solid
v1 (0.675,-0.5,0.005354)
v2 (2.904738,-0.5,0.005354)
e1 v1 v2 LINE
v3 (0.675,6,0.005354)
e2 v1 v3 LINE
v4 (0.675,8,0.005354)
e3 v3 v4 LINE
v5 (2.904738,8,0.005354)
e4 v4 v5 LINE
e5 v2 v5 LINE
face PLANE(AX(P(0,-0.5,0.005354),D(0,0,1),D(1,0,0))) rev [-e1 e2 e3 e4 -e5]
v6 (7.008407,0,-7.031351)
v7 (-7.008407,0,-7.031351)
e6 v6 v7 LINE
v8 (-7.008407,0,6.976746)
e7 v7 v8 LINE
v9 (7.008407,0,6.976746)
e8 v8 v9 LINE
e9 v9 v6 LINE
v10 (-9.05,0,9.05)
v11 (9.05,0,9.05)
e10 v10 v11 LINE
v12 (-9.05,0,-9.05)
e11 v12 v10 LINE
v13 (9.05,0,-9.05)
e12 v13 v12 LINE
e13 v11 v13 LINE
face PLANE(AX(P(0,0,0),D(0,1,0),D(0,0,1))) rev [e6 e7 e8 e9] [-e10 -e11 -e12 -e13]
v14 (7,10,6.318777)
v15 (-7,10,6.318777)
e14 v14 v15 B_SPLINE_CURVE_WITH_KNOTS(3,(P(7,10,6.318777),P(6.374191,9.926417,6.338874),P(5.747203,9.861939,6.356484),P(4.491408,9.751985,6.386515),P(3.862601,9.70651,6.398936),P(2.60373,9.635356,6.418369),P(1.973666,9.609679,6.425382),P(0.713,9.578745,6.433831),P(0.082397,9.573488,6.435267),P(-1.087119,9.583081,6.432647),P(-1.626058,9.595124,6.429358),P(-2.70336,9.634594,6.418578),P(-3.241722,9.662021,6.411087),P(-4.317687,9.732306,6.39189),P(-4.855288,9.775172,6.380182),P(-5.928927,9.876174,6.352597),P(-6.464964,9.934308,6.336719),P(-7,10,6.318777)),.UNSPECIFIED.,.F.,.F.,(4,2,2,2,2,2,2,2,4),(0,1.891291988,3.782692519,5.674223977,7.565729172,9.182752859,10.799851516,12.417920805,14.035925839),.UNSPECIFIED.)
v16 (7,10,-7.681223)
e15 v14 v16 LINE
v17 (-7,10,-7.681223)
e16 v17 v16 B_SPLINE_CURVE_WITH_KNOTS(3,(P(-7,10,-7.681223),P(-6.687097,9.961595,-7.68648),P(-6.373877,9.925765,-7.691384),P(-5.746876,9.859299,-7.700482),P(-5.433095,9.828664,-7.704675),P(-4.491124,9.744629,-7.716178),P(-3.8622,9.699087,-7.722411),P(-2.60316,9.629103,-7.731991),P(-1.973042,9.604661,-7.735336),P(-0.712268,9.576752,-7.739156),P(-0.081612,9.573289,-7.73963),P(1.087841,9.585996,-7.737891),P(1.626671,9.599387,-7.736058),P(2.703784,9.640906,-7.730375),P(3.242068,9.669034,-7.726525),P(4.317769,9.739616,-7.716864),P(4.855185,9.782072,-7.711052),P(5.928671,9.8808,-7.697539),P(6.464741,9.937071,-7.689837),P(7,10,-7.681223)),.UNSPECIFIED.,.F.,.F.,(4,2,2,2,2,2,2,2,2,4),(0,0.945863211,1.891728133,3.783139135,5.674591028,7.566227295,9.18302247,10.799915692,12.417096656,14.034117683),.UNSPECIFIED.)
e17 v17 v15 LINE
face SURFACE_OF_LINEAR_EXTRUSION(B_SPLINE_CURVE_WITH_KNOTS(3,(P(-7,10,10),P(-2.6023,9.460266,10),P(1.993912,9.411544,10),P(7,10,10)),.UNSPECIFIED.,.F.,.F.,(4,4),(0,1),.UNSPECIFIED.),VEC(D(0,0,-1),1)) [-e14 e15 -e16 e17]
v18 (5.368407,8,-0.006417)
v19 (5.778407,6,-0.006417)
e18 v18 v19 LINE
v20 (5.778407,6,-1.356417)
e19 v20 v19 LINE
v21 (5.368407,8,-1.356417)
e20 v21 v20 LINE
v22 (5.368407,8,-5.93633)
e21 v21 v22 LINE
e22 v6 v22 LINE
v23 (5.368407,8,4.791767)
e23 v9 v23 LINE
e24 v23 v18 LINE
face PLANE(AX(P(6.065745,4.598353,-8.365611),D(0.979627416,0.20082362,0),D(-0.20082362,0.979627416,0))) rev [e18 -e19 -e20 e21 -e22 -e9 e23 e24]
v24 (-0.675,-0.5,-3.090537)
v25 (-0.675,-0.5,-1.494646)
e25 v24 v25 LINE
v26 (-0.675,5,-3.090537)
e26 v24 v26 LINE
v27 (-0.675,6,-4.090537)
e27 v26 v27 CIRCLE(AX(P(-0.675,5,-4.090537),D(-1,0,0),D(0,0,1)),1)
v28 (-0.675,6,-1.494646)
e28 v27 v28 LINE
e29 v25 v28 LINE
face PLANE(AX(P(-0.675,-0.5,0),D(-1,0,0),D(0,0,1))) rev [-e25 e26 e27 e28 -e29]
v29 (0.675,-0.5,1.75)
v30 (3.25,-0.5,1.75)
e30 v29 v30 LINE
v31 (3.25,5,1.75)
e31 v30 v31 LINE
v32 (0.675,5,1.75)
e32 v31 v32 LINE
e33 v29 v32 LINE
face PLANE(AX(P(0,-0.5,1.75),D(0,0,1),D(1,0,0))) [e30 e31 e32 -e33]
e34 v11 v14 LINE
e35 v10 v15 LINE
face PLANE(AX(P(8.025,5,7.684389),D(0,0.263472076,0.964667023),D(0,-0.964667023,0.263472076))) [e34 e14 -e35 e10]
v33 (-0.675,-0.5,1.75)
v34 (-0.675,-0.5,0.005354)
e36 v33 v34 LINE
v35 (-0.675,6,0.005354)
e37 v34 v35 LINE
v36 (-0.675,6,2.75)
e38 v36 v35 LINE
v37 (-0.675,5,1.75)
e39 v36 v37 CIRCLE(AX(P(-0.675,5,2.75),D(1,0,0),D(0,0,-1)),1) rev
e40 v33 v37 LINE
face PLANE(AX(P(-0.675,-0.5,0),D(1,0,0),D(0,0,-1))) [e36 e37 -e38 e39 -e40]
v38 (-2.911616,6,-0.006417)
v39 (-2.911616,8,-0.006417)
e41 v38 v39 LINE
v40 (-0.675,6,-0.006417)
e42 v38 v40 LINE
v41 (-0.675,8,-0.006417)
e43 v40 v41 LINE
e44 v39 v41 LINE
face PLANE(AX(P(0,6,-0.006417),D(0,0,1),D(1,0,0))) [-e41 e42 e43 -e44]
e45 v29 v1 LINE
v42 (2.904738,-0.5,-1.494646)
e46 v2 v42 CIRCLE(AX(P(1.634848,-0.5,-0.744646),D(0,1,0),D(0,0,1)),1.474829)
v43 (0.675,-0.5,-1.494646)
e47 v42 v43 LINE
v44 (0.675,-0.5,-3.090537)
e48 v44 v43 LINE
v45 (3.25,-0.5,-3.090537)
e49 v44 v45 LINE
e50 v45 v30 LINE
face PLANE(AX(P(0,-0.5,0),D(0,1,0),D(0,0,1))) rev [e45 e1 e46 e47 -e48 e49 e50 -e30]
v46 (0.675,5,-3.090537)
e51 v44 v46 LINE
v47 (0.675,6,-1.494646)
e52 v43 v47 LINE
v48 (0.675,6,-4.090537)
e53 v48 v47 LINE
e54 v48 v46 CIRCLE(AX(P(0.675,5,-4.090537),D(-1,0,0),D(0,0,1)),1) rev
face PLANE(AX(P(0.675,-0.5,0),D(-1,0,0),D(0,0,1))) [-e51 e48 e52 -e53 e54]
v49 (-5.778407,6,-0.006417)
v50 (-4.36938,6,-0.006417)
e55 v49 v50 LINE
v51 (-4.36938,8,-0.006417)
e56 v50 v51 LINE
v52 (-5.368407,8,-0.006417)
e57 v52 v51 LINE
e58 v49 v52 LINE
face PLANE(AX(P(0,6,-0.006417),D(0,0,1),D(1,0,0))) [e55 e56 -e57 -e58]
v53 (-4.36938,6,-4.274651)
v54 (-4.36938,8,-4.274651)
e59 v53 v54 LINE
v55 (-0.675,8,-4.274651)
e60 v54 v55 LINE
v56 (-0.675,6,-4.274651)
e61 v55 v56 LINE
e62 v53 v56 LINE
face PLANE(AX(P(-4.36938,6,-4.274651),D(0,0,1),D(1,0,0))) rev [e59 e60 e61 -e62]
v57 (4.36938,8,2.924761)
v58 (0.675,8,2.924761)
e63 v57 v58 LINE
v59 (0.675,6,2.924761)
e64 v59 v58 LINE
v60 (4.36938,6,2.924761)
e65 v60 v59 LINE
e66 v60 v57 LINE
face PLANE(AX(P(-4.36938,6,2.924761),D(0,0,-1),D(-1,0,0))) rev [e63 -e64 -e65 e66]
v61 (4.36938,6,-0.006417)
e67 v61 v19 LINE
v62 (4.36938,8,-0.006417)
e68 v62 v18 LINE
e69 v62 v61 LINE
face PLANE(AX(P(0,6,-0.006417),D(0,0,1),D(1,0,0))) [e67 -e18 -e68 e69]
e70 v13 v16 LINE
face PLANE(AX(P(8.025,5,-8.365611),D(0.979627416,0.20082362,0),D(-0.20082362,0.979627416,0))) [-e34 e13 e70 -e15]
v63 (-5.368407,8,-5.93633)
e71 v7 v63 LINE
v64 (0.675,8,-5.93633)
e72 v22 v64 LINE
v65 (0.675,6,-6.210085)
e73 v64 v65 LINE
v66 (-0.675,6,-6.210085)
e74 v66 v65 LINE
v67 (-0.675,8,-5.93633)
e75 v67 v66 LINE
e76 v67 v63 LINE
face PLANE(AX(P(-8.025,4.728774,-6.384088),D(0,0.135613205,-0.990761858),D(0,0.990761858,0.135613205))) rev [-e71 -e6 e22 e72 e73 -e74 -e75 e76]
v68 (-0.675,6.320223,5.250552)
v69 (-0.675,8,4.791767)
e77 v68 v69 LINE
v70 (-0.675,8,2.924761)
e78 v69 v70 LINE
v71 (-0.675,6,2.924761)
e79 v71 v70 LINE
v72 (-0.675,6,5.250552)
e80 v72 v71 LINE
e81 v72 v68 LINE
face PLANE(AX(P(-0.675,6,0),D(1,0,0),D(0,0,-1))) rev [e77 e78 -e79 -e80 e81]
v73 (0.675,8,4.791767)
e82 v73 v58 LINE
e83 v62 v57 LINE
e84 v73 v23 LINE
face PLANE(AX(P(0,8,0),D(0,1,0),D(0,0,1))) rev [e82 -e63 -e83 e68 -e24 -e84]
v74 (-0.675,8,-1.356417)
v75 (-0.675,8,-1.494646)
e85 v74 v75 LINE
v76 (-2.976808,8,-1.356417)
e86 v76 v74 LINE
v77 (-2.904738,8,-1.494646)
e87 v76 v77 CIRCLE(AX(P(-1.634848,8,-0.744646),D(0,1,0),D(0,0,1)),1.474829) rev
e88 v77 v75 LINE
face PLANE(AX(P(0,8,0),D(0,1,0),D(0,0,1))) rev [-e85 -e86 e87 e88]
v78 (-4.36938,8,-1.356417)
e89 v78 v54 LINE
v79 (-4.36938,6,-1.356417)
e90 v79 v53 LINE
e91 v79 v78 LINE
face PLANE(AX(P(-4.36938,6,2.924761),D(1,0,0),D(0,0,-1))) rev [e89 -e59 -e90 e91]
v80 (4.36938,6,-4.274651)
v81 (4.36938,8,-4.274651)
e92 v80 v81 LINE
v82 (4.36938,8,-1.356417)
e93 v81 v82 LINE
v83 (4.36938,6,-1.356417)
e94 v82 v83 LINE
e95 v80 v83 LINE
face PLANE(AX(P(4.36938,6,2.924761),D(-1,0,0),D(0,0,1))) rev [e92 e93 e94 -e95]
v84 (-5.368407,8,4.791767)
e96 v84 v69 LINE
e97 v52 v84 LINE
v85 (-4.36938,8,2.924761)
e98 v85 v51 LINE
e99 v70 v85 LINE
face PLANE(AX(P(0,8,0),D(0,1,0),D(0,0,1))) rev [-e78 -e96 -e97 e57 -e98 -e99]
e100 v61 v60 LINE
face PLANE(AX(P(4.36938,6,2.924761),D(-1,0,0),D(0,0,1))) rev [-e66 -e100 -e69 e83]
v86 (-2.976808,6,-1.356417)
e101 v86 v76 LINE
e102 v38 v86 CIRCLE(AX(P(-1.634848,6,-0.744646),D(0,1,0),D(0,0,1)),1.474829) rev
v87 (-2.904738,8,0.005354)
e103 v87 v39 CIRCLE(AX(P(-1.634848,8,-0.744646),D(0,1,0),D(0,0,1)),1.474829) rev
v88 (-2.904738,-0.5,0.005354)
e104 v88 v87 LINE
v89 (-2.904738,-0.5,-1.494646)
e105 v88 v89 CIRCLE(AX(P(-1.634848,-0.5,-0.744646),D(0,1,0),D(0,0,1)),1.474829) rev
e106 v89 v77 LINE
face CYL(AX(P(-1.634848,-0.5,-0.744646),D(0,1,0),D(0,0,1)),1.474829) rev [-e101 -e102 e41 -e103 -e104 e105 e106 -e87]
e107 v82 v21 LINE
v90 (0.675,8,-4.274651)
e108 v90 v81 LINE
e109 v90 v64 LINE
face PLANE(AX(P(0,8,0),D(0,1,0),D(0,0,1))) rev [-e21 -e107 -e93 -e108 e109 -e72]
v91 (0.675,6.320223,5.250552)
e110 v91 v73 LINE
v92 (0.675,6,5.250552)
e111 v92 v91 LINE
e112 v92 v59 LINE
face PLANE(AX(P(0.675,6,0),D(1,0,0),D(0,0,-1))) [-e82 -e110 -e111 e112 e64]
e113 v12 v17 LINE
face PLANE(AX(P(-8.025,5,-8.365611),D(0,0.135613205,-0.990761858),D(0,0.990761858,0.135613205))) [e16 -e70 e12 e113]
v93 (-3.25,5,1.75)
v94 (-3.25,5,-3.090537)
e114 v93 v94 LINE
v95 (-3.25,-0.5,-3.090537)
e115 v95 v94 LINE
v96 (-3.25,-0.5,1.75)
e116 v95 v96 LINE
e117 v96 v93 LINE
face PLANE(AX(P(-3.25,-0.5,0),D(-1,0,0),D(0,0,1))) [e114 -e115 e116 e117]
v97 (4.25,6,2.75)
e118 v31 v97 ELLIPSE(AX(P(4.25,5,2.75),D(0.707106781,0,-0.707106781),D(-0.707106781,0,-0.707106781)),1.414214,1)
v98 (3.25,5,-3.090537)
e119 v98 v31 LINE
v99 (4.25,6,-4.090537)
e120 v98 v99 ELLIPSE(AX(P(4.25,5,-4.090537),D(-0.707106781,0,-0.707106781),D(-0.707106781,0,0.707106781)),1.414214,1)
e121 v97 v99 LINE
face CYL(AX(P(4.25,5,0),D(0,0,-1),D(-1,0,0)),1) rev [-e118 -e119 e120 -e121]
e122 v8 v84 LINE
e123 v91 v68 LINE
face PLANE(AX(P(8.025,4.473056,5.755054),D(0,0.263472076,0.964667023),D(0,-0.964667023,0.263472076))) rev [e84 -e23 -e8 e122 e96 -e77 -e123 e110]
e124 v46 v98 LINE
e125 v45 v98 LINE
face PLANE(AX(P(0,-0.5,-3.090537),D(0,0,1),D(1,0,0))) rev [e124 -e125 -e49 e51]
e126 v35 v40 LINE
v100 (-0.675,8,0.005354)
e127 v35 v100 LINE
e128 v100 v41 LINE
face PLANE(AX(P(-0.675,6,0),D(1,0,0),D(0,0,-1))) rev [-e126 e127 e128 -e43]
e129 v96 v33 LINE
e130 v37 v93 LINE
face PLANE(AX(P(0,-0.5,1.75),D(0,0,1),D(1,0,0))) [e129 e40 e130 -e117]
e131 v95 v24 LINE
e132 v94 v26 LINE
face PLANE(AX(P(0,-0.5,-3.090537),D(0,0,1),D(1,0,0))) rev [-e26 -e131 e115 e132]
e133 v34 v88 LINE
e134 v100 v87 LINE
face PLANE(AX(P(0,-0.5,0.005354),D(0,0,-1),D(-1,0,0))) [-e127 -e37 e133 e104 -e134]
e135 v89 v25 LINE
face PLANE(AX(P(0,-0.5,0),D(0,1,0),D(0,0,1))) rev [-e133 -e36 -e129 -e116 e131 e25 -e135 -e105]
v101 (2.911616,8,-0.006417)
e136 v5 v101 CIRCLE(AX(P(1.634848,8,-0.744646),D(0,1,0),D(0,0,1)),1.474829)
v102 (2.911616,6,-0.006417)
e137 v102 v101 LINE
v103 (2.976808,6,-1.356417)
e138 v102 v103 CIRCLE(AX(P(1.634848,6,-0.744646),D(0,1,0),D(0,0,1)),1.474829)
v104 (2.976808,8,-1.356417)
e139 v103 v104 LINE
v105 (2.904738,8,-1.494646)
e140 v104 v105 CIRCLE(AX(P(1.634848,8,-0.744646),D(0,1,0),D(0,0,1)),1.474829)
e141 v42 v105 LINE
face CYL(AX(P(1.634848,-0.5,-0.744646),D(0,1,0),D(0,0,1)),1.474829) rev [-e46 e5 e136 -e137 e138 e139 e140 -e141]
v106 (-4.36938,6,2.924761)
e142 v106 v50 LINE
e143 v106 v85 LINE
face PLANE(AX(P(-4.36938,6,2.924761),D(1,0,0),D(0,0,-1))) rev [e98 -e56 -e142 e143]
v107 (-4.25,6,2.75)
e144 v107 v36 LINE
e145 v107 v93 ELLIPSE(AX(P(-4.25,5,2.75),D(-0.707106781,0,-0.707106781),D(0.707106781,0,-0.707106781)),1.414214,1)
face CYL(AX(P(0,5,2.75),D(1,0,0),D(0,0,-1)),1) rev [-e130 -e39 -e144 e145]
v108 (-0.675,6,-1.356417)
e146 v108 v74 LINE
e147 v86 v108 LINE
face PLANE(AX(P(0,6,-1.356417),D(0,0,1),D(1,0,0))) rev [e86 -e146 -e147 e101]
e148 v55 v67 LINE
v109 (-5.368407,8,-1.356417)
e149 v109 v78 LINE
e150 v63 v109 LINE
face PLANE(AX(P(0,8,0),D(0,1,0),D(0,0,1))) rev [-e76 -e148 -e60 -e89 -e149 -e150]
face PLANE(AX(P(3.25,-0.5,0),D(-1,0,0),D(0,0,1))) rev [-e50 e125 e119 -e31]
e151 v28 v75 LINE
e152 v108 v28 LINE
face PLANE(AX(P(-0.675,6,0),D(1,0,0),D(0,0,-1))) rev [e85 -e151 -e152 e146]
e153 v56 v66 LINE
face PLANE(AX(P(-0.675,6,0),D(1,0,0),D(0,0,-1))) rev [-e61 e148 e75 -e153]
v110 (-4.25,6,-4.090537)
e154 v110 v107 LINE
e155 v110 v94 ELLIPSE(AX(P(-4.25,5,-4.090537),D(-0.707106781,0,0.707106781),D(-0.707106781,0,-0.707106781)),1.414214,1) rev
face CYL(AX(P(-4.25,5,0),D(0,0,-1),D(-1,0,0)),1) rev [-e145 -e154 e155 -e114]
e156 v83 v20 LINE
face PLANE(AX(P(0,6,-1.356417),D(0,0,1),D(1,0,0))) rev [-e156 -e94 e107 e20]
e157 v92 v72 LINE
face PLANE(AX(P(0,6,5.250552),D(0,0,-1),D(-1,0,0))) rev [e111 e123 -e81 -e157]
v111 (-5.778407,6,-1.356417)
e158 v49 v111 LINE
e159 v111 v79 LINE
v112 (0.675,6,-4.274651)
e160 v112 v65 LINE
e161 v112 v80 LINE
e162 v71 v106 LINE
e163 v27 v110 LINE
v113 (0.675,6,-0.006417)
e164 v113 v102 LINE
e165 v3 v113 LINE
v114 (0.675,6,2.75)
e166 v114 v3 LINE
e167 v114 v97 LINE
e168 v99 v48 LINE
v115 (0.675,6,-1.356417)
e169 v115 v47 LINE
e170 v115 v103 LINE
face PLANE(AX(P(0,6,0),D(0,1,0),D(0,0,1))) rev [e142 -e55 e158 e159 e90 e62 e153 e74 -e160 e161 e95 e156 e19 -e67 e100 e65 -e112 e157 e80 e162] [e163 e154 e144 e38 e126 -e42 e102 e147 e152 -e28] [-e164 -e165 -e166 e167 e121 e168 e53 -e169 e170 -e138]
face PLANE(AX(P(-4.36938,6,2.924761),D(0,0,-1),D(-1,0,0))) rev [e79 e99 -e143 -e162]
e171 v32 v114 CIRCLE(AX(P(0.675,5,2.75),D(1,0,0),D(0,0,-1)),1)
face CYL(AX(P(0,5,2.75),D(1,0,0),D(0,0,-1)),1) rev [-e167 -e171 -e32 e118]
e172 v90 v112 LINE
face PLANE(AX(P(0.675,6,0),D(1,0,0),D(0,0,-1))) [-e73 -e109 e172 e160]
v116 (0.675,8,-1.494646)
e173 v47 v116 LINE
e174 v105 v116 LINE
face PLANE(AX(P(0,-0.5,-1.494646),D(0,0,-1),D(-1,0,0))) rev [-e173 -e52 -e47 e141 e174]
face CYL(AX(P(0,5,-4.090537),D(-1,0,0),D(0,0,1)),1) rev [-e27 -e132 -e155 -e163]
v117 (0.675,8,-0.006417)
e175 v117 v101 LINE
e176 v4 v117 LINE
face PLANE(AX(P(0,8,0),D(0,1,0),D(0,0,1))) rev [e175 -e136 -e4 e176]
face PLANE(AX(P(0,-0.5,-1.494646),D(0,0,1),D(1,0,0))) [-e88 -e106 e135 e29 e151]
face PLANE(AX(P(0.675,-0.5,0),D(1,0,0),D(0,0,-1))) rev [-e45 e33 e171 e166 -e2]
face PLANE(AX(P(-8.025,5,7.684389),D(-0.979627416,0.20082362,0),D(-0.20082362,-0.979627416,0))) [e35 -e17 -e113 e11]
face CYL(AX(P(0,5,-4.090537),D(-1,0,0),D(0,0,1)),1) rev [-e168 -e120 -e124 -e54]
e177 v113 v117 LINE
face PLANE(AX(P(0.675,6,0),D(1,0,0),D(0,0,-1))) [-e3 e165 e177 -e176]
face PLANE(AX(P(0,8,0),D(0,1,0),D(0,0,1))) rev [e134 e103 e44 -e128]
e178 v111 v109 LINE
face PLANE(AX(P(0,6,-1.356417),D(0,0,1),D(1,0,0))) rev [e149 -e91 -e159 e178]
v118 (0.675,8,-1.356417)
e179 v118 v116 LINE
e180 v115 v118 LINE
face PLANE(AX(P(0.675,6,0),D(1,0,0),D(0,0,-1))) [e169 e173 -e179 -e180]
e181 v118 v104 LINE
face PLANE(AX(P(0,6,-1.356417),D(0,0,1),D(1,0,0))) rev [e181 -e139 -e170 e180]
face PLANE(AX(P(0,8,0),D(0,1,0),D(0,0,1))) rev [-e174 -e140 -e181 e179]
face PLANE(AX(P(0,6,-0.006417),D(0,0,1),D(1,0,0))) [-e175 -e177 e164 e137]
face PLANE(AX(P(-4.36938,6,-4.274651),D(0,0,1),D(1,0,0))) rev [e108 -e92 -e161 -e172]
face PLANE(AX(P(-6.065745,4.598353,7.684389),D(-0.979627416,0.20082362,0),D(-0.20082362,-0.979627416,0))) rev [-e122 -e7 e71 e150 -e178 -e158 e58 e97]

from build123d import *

# Parameters (mm, degrees)
SHELL1_T                = -2
SKETCH5_W               = 1.35
SKETCH5_H               = 12.225319986
SKETCH5_W_2             = 12.114403326
SKETCH5_H_2             = 1.35
BOSS_EXTRUDE1_DEPTH     = 4
CUT_EXTRUDE3_DEPTH      = 10
CUT_EXTRUDE3_DEPTH_BACK = 10
BOSS_EXTRUDE2_START     = -0.5
BOSS_EXTRUDE2_DEPTH     = 10
BOSS_EXTRUDE2_2_DEPTH   = 10
SKETCH8_W               = 8.738759906
SKETCH8_H               = 7.199411956
SKETCH8_W_2             = 6.5
SKETCH8_H_2             = 4.831184338
BOSS_EXTRUDE4_DEPTH     = 2
FILLET4_R               = 1


with BuildPart() as part:
    # Loft1: read off the stored shape, not the designer's step
    # Loft1: loft between two sections, ruled curve by curve
    loft1_from = [
        Edge.make_line((-9.05, 0, 9.05), (-9.05, 0, -9.05)),
        Edge.make_line((-9.05, 0, -9.05), (9.05, 0, -9.05)),
        Edge.make_line((9.05, 0, 9.05), (-9.05, 0, 9.05)),
        Edge.make_line((9.05, 0, -9.05), (9.05, 0, 9.05)),
    ]
    loft1_to = [
        Edge.make_line((-7, 10, 6.318777005), (-7, 10, -7.681222995)),
        Edge.make_line((-7, 10, -7.681222995), (7, 10, -7.681222995)),
        Edge.make_line((7, 10, 6.318777005), (-7, 10, 6.318777005)),
        Edge.make_line((7, 10, -7.681222995), (7, 10, 6.318777005)),
    ]
    loft1 = Solid(Shell([*[Face.make_surface_from_curves(loft1_from[k], loft1_to[k]) for k in range(4)], Face(Wire(loft1_from)), Face(Wire(loft1_to))]))
    add(loft1)

    # Shell1
    shell1_openings = [part.faces().sort_by_distance(p)[0] for p in [
        (0, 0, 0),
    ]]
    offset(amount=SHELL1_T, openings=shell1_openings, kind=Kind.INTERSECTION)

    # Sketch5 → Boss-Extrude1 (add)
    with BuildSketch(Plane(origin=(0, 10, 0), x_dir=(1, 0, 0), z_dir=(0, 1, 0))):
        with Locations((0, 0.862108036)):
            Rectangle(SKETCH5_W, SKETCH5_H)
        with Locations((0.109128691, 0.681416915)):
            Rectangle(SKETCH5_W_2, SKETCH5_H_2)
    extrude(amount=-BOSS_EXTRUDE1_DEPTH)

    # Sketch4 → Cut-Extrude3 (cut, two sides: drawn at the far end of the back side and taken through both)
    with BuildSketch(Plane.XY.offset(-CUT_EXTRUDE3_DEPTH_BACK)):
        with BuildLine():
            Line((-7, 10), (7, 10))
            add(Edge.make_bspline(
                [(-7, 10), (-2.602300298, 9.460265696), (1.993912061, 9.41154423), (7, 10)],
                knots=[0, 0, 0, 0, 1, 1, 1, 1], degree=3))
        make_face()
    extrude(amount=CUT_EXTRUDE3_DEPTH + CUT_EXTRUDE3_DEPTH_BACK, mode=Mode.SUBTRACT)



with BuildPart() as body_2:
    # Sketch6 → Boss-Extrude2 (new body)
    with BuildSketch(Plane(origin=(0, 10, 0), x_dir=(1, 0, 0), z_dir=(0, 1, 0)).offset(BOSS_EXTRUDE2_START)):
        with BuildLine():
            Line((0.675, -0.005353557), (0.675, -1.75))
            Line((0.675, -1.75), (3.25, -1.75))
            Line((3.25, -1.75), (3.25, 3.09053704))
            Line((3.25, 3.09053704), (0.675, 3.09053704))
            Line((0.675, 3.09053704), (0.675, 1.494646443))
            Line((0.675, 1.494646443), (2.90473751, 1.494646443))
            ThreePointArc((2.90473751, 1.494646443), (3.109676589, 0.744646443), (2.90473751, -0.005353557))
            Line((2.90473751, -0.005353557), (0.675, -0.005353557))
        make_face()
    extrude(amount=-BOSS_EXTRUDE2_DEPTH)


with BuildPart() as body_3:
    # Sketch6 → Boss-Extrude2 2 (new body)
    with BuildSketch(Plane(origin=(0, 10, 0), x_dir=(1, 0, 0), z_dir=(0, 1, 0)).offset(BOSS_EXTRUDE2_START)):
        with BuildLine():
            Line((-0.675, -1.75), (-0.675, -0.005353557))
            Line((-0.675, -0.005353557), (-2.90473751, -0.005353557))
            ThreePointArc((-2.90473751, -0.005353557), (-3.109676589, 0.744646443), (-2.90473751, 1.494646443))
            Line((-2.90473751, 1.494646443), (-0.675, 1.494646443))
            Line((-0.675, 1.494646443), (-0.675, 3.09053704))
            Line((-0.675, 3.09053704), (-3.25, 3.09053704))
            Line((-3.25, 3.09053704), (-3.25, -1.75))
            Line((-3.25, -1.75), (-0.675, -1.75))
        make_face()
    extrude(amount=-BOSS_EXTRUDE2_2_DEPTH)


with BuildPart() as part_1:
    add(part.part)

    add(body_2.part)  # Boss-Extrude4 merges body 2

    add(body_3.part)  # Boss-Extrude4 merges body 3
    # Sketch8 → Boss-Extrude4 (add)
    with BuildSketch(Plane(origin=(0, 8, -8), x_dir=(1, 0, 0), z_dir=(0, -1, 0))):
        with Locations((0, 7.325055129)):
            Rectangle(SKETCH8_W, SKETCH8_H)
        with Locations((0, 7.325055129)):
            Rectangle(SKETCH8_W_2, SKETCH8_H_2, mode=Mode.SUBTRACT)
    extrude(amount=BOSS_EXTRUDE4_DEPTH)

    # Fillet4
    fillet4_edges = [part_1.edges().sort_by_distance(p)[0] for p in [
        (3.25, 6, -0.67026852),
        (-3.25, 6, -0.67026852),
        (-1.9625, 6, -3.09053704),
        (1.9625, 6, -3.09053704),
        (1.9625, 6, 1.75),
        (-1.9625, 6, 1.75),
    ]]
    fillet(fillet4_edges, radius=FILLET4_R)


solid = part_1.part
